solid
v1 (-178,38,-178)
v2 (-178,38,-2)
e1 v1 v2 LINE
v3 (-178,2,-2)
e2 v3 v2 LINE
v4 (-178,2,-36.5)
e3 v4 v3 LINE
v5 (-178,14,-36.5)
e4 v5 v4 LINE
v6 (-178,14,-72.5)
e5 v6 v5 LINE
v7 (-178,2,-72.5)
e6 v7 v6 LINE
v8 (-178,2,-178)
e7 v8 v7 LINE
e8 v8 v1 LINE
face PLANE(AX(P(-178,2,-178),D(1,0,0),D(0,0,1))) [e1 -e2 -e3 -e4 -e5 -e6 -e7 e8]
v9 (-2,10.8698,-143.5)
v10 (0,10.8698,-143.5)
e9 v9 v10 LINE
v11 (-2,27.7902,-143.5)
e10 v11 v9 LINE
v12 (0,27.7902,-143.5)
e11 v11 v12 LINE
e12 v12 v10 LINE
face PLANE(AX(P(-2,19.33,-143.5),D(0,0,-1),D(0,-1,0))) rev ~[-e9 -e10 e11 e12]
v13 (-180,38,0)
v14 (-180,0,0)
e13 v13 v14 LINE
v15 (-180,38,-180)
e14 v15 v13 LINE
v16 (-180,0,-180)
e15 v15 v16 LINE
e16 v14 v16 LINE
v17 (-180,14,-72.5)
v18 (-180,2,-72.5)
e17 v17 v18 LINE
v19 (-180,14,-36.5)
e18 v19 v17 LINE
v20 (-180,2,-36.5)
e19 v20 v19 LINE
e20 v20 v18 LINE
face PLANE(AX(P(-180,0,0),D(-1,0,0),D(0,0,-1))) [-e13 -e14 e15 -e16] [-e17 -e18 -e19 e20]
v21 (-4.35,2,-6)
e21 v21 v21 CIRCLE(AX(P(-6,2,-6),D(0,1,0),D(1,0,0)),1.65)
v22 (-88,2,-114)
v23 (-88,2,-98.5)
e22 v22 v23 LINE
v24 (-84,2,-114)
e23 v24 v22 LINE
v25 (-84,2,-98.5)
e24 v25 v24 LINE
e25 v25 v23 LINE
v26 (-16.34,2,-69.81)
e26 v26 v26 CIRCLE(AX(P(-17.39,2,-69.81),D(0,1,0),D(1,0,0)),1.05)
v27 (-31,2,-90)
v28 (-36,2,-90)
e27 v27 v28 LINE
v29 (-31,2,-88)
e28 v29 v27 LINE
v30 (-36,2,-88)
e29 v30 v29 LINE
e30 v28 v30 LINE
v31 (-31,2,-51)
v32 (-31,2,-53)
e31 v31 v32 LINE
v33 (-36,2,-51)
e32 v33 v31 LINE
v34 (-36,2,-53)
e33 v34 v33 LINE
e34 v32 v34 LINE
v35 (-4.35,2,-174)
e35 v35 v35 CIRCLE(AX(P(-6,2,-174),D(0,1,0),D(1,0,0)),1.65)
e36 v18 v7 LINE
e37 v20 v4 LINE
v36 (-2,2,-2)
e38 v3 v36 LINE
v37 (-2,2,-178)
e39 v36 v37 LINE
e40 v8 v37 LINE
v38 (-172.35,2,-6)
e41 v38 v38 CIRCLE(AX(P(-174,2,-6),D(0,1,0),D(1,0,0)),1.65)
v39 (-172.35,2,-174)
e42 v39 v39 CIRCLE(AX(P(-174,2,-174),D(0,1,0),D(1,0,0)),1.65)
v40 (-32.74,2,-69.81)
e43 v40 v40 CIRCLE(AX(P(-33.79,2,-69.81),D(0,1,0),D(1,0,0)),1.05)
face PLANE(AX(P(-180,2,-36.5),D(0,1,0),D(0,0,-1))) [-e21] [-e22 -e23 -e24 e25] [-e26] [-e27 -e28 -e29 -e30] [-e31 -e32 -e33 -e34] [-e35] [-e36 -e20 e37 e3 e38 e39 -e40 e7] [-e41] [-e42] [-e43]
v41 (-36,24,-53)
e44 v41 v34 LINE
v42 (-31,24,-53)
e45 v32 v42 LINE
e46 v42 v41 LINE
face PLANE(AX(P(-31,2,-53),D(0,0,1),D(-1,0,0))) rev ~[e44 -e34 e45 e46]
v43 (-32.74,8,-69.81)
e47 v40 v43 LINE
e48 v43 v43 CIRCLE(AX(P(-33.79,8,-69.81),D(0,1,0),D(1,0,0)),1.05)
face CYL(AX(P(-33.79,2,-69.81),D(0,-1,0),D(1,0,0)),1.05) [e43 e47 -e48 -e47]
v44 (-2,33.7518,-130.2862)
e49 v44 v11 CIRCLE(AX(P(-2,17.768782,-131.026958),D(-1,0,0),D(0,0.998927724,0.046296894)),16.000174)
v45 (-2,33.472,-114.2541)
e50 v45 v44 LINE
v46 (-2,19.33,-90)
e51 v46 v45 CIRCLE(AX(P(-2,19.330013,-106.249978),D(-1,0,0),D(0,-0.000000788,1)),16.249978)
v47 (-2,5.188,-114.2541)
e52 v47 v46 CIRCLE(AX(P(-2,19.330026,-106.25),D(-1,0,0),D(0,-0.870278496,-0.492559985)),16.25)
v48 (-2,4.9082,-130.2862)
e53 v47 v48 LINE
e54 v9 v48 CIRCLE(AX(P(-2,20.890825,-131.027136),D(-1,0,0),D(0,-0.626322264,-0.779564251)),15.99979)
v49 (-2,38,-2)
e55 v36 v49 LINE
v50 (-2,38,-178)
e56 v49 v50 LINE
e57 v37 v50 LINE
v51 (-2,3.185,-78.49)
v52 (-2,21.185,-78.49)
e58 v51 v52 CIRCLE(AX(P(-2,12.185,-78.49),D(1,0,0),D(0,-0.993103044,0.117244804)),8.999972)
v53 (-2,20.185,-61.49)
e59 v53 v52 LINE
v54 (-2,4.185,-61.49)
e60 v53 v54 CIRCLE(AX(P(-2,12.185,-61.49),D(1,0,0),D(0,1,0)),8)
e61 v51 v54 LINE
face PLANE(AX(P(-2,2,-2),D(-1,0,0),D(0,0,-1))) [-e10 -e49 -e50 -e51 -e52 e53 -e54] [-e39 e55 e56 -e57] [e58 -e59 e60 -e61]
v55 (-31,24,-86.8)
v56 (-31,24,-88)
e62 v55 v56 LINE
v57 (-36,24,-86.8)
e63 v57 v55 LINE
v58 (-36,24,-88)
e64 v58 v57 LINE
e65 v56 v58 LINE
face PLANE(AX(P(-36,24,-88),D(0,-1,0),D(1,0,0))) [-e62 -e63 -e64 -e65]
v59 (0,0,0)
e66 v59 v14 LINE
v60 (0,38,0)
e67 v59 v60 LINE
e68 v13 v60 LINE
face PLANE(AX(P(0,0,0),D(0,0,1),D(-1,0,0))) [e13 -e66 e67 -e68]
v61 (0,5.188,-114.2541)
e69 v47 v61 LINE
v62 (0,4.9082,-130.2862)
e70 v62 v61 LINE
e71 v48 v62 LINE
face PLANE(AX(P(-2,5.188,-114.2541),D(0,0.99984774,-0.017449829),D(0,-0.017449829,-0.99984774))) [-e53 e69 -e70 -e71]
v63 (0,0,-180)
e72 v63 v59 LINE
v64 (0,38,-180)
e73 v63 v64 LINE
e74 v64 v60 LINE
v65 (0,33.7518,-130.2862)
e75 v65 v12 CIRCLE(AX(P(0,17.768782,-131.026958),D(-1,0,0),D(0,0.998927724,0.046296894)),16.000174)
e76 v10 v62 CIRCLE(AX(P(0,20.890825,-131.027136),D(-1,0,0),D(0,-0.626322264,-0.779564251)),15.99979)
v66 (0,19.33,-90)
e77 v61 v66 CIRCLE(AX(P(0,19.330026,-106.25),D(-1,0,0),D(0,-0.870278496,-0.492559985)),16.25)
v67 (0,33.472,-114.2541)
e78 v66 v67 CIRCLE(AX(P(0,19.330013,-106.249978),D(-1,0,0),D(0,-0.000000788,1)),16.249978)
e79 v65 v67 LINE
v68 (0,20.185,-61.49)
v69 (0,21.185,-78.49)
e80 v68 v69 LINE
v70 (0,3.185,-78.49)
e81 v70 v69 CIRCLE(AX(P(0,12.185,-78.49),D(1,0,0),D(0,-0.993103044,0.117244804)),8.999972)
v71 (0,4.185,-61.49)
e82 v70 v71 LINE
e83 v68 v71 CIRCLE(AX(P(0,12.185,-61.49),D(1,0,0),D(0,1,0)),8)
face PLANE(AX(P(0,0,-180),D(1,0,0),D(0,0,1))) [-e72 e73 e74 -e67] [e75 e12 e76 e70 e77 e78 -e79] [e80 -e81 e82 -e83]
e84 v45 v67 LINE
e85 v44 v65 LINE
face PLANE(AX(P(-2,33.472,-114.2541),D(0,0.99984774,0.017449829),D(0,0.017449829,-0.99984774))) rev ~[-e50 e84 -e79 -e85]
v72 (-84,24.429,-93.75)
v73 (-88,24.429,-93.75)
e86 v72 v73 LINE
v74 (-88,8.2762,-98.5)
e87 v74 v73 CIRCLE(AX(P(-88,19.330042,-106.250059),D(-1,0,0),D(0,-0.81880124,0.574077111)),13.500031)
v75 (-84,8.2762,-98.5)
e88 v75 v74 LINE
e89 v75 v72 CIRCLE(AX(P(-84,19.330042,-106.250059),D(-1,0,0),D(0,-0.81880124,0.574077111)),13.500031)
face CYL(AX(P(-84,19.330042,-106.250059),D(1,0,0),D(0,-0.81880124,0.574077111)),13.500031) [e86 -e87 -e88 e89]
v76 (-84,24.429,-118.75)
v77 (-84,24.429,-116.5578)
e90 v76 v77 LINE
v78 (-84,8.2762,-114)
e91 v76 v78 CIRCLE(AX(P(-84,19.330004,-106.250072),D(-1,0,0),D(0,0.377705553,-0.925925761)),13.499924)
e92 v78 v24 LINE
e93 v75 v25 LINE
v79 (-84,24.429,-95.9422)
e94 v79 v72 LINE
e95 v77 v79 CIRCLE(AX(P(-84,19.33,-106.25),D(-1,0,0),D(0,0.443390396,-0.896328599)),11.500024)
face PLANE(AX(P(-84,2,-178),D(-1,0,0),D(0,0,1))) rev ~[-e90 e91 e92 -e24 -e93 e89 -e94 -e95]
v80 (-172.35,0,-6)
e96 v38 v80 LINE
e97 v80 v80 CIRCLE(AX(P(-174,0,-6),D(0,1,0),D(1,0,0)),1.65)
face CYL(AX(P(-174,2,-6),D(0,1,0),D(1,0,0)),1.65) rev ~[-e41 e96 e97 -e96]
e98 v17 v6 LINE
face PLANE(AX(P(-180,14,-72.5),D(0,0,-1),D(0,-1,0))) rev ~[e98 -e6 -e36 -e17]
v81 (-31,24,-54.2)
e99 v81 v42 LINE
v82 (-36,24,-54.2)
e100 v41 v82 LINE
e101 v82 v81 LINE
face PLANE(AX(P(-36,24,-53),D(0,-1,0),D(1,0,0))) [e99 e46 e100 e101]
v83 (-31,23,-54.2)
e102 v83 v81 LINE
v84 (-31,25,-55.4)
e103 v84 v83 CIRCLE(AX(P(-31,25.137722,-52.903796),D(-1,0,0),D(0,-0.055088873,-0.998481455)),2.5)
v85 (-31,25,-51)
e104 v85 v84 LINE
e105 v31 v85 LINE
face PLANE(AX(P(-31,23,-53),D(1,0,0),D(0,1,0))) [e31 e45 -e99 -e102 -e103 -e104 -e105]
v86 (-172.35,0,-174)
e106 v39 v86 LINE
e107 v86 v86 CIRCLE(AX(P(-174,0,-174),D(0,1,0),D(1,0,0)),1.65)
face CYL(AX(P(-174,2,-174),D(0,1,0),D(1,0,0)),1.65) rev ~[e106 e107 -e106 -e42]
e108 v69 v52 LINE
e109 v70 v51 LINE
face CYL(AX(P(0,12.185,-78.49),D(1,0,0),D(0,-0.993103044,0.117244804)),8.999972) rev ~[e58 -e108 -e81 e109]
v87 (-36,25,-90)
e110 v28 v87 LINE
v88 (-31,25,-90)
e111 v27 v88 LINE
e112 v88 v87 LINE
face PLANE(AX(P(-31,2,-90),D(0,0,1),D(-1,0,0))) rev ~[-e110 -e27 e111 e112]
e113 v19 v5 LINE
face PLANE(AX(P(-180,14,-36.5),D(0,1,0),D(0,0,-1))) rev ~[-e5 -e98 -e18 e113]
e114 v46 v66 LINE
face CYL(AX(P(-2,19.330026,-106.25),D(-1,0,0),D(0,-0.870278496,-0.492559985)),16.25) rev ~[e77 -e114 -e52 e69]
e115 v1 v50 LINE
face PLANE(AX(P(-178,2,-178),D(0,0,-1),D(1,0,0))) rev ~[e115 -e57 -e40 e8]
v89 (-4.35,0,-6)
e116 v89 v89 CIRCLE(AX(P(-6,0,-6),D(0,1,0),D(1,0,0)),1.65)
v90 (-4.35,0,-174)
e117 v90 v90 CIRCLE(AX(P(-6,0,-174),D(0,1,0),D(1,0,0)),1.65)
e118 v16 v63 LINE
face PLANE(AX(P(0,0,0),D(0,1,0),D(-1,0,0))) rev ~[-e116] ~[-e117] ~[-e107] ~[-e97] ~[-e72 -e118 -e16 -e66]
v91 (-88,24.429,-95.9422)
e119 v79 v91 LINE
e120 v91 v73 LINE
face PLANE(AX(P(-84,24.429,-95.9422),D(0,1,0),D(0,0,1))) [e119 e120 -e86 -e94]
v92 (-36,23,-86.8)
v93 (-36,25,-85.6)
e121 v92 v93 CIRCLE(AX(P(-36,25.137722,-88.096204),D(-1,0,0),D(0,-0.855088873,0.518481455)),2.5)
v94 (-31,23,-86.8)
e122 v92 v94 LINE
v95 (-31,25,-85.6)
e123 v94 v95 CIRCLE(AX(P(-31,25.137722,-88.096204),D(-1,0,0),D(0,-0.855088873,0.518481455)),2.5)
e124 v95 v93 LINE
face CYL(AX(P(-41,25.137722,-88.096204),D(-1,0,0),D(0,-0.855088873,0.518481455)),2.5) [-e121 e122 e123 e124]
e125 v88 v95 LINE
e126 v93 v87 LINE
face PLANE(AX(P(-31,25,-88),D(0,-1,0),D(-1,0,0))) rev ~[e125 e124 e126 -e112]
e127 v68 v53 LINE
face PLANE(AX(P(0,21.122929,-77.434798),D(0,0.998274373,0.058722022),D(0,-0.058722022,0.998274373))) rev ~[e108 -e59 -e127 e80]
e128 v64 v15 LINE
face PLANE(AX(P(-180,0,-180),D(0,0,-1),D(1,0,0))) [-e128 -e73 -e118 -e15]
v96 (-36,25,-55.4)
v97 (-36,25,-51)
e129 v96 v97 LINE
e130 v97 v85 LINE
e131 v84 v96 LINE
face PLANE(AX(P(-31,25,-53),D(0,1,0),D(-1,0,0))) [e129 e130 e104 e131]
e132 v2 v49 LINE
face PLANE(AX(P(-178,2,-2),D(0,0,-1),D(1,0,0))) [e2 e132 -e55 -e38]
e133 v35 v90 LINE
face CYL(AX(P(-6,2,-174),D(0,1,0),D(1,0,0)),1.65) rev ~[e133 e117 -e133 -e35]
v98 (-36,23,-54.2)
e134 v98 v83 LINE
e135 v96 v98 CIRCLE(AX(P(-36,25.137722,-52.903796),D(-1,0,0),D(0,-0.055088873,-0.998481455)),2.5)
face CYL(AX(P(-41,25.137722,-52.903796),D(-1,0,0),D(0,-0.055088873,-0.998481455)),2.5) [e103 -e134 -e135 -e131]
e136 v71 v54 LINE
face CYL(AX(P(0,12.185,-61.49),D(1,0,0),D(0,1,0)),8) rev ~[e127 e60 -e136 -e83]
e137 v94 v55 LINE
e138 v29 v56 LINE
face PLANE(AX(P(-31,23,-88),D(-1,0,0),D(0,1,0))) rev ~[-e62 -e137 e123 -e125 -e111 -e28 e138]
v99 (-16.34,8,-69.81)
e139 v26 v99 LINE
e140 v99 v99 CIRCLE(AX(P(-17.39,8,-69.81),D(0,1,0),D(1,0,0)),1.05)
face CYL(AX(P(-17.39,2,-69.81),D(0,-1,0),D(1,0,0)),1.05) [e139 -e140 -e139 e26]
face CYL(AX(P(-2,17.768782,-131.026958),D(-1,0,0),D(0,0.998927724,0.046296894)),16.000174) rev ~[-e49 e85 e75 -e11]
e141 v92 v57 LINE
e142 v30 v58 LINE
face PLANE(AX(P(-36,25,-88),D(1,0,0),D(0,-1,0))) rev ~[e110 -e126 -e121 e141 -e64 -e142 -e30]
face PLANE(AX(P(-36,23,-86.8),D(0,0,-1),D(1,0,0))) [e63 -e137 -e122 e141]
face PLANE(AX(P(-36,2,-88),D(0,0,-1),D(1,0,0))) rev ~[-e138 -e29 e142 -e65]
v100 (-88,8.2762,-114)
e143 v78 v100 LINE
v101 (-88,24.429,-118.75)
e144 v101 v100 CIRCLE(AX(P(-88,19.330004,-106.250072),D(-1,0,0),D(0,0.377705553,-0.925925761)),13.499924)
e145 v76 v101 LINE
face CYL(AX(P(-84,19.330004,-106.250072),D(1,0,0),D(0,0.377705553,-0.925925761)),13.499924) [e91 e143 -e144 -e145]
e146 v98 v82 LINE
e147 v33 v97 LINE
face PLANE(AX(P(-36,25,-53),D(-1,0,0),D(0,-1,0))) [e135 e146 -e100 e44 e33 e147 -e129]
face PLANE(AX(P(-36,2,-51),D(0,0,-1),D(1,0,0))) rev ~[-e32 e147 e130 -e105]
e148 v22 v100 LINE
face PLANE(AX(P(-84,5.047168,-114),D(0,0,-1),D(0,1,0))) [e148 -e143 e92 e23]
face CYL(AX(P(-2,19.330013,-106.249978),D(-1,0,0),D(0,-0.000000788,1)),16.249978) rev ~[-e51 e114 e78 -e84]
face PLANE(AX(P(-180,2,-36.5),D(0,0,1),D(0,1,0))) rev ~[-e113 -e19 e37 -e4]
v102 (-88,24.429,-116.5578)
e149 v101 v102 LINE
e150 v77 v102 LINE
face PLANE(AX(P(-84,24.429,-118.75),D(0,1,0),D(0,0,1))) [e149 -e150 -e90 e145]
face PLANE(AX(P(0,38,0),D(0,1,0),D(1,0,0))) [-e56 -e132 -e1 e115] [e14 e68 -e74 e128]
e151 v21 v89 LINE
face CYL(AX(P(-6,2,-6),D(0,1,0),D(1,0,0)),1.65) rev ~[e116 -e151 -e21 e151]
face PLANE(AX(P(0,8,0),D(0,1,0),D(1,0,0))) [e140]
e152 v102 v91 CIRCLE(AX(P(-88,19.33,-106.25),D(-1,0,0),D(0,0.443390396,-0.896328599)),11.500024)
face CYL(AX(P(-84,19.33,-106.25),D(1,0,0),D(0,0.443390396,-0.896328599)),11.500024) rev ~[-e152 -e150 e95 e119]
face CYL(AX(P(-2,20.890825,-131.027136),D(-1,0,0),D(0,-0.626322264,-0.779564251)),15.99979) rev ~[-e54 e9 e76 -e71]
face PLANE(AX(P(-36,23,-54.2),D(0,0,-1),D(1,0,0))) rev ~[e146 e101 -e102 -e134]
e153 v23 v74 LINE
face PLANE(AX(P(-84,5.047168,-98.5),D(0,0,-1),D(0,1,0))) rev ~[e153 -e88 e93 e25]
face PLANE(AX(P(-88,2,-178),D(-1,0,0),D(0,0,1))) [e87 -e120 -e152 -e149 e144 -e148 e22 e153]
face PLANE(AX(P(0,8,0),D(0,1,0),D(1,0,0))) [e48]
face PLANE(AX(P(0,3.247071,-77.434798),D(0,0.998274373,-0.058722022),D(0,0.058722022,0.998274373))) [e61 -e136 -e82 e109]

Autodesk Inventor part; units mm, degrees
ref_plane "YZ Plane" through (0, 0, 0) normal (1, 0, 0) x (0, 1, 0)
ref_plane "XZ Plane" through (0, 0, 0) normal (0, 1, 0) x (-1, 0, 0)
sketch "Sketch1" plane through (0, 0, 0) normal (0, 1, 0) x (-1, 0, 0)
  line L0 (0, 0) -> (180, 0)
  line L1 (180, 0) -> (180, -180)
  line L2 (180, -180) -> (0, -180)
  line L3 (0, -180) -> (0, 0)
  dimension "d0" = 180
  dimension "d1" = 180
extrude "Extrusion1" add sketch "Sketch1" along normal blind 2
sketch "Sketch4" plane through (0, 2, 0) normal (0, 1, 0) x (1, 0, 0)
  line L0 (0, 180) -> (-180, 180) projected
  line L1 (-180, 180) -> (-180, 0) projected
  line L2 (0, 180) -> (-180, 180)
  line L3 (-180, 180) -> (-180, 178)
  line L4 (-180, 178) -> (0, 178)
  line L5 (0, 178) -> (0, 180)
  line L6 (-180, 0) -> (0, 0) projected
  line L7 (0, 0) -> (-180, 0)
  line L8 (-180, 0) -> (-180, 2)
  line L9 (-180, 2) -> (0, 2)
  line L10 (0, 2) -> (0, 0)
  line L11 (0, 2) -> (-2, 2)
  line L12 (-2, 2) -> (-2, 178)
  line L13 (-2, 178) -> (0, 178)
  line L14 (0, 178) -> (0, 2)
  line L15 (-180, 178) -> (-178, 178)
  line L16 (-178, 178) -> (-178, 2)
  line L17 (-178, 2) -> (-180, 2)
  line L18 (-180, 2) -> (-180, 178)
  dimension "d16" = 2
  dimension "d17" = 2
  dimension "d18" = 2
  dimension "d19" = 2
extrude "Extrusion4" add sketch "Sketch4" along normal blind 36 contours L5 L4 L1 L0 | L14 L9 L12 L4 | L4 L16 L9 L1 | L10 L6 L1 L9
sketch "Sketch5" plane through (0, 2, 0) normal (0, 1, 0) x (1, 0, 0)
  circle A0 centre (-174, 6) radius 1.65
  circle A1 centre (-174, 174) radius 1.65
  circle A2 centre (-6, 174) radius 1.65
  circle A3 centre (-6, 6) radius 1.65
  point P0 (0, 0)
  dimension "d22" = 3.3
  dimension "d23" = 3.3
  dimension "d24" = 3.3
  dimension "d25" = 3.3
extrude "Extrusion5" cut sketch "Sketch5" against normal through all
sketch "Sketch8" plane through (-180, 0, -180) normal (-1, 0, 0) x (0, 0, 1)
  line L0 (178, 2) -> (2, 2) projected
  line L1 (143.5, 14) -> (107.5, 14)
  line L2 (107.5, 14) -> (107.5, 2)
  line L3 (107.5, 2) -> (143.5, 2)
  line L4 (143.5, 2) -> (143.5, 14)
  line L5 (178, 2) -> (178, 38) projected
  point P0 (180, 0)
  point P1 (143.5, 2)
  point P2 (107.5, 2)
  dimension "d84" = 36
  dimension "d101" = 12
  dimension "d108" = 34.5
extrude "Extrusion10" cut sketch "Sketch8" against normal blind 10
sketch "Sketch15" plane through (-2, 2, -2) normal (-1, 0, 0) x (0, 0, 1)
  line L0 (-141.5, 17.33) -> (-133.04, 17.33) construction
  line L1 (-112.2541, 3.188) -> (-128.2862, 2.9082)
  arc A0 (-141.5, 8.8698) -> (-128.2862, 2.9082) centre (-129.027, 18.891) ccw
  arc A1 (-112.2541, 3.188) -> (-88, 17.33) centre (-104.25, 17.33) ccw
  line L2 (-112.2541, 31.472) -> (-128.2862, 31.7518)
  arc A2 (-128.2862, 31.7518) -> (-141.5, 25.7902) centre (-129.027, 15.769) ccw
  arc A3 (-88, 17.33) -> (-112.2541, 31.472) centre (-104.25, 17.33) ccw
  line L3 (-141.5, 17.33) -> (-141.5, 8.8698)
  line L4 (-141.5, 17.33) -> (-141.5, 25.7902)
  line L5 (-176, 36) -> (0, 36) projected
  line L6 (0, 0) -> (-176, 0) projected
  point P0 (2, -2)
extrude "Extrusion17" cut sketch "Sketch15" against normal through all
ref_plane "Work Plane1" through (-84, 2, -178) normal (-1, 0, 0) x (0, 0, 1)
sketch "Sketch16" plane through (-84, 2, -178) normal (-1, 0, 0) x (0, 0, 1)
  arc A0 (63.7459, 3.188) -> (63.7459, 31.472) centre (71.75, 17.33) ccw projected
  line L0 (176, 0) -> (0, 0) projected
  line L1 (71.75, 0) -> (79.5, 0)
  line L2 (-2, -2) -> (178, -2) projected
  line L3 (45.25, 0) -> (53, 0) construction
  line L4 (79.5, 0) -> (79.5, 6.2762)
  line L5 (71.75, 0) -> (64, 0)
  line L6 (45.25, 0) -> (53, 0) construction
  line L7 (64, 0) -> (64, 6.2762)
  arc A1 (61.4422, 22.429) -> (82.0578, 22.429) centre (71.75, 17.33) ccw
  line L8 (59.25, 22.429) -> (61.4422, 22.429)
  line L9 (82.0578, 22.429) -> (84.25, 22.429)
  arc A2 (59.25, 22.429) -> (64, 6.2762) centre (71.75, 17.33) ccw
  arc A3 (79.5, 6.2762) -> (84.25, 22.429) centre (71.75, 17.33) ccw
  dimension "d135" = 23
extrude "Extrusion18" add sketch "Sketch16" along normal blind 4
sketch "Sketch17" plane through (0, 0, 0) normal (1, 0, 0) x (0, 0, -1)
  line L0 (36.5, 2) -> (2, 2) projected
  line L1 (53, 2) -> (88, 2)
  line L2 (88, 2) -> (88, 23.37)
  line L3 (88, 23.37) -> (53, 23.37)
  line L4 (53, 23.37) -> (53, 2)
  line L5 (0, 0) -> (0, 38) projected
  arc A0 (61.49, 20.185) -> (61.49, 4.185) centre (61.49, 12.185) ccw
  arc A1 (77.4348, 3.2471) -> (77.4348, 21.1229) centre (78.49, 12.185) ccw
  line L6 (78.49, 3.185) -> (61.49, 4.185)
  line L7 (78.49, 21.185) -> (61.49, 20.185)
  dimension "d144" = 35
  dimension "d145" = 21.37
  dimension "d147" = 16
  dimension "d148" = 18
extrude "Extrusion19" cut sketch "Sketch17" against normal blind 10 contours L7 A1 L6 A0
sketch "Sketch21" plane through (0, 2, 0) normal (0, 1, 0) x (1, 0, 0)
  circle A0 centre (-17.39, 69.81) radius 1.05
  circle A1 centre (-33.79, 69.81) radius 1.05
  point P0 (0, 0)
  dimension "d155" = 2.1
  dimension "d156" = 2.1
extrude "Extrusion21" add sketch "Sketch21" along normal blind 6
sketch "Sketch22" plane through (0, 2, 0) normal (0, 1, 0) x (1, 0, 0)
  line L0 (-36, 88) -> (-31, 88)
  line L1 (-31, 88) -> (-31, 90)
  line L2 (-31, 90) -> (-36, 90)
  line L3 (-36, 90) -> (-36, 88)
  line L4 (-31, 53) -> (-36, 53)
  line L5 (-36, 53) -> (-36, 51)
  line L6 (-36, 51) -> (-31, 51)
  line L7 (-31, 51) -> (-31, 53)
  line L8 (-2, 2) -> (-2, 178) projected
  line L9 (-2, 90) -> (-178, 90) construction
  line L10 (-178, 178) -> (-178, 72.5) projected
  point P0 (0, 0)
  dimension "d159" = 5
  dimension "d160" = 2
  dimension "d161" = 5
  dimension "d162" = 2
extrude "Extrusion22" add sketch "Sketch22" along normal blind 23
sketch "Sketch23" plane through (-36, 2, -88) normal (0, 0, 1) x (1, 0, 0)
  line L0 (5, 0) -> (5, 23) projected
  line L1 (5, 23) -> (0, 23)
  line L2 (0, 23) -> (0, 21)
  line L3 (0, 21) -> (5, 21)
  line L4 (5, 21) -> (5, 23)
  point P0 (36, -2)
  dimension "d165" = 5
  dimension "d166" = 2
sketch "Sketch24" plane through (-31, 2, -53) normal (0, 0, -1) x (-1, 0, 0)
  line L0 (0, 23) -> (5, 23)
  line L1 (5, 23) -> (5, 21)
  line L2 (5, 21) -> (0, 21)
  line L3 (0, 21) -> (0, 23)
  point P0 (-31, -2)
  dimension "d167" = 5
  dimension "d168" = 2
extrude "Extrusion23" add sketch "Sketch23" along normal blind 2.4
extrude "Extrusion24" add sketch "Sketch24" along normal blind 2.4
sketch "Sketch25" plane through (-36, 23, -88) normal (0, -1, 0) x (1, 0, 0)
  line L0 (5, 0) -> (0, 0)
  line L1 (0, 0) -> (0, 1.2)
  line L2 (0, 1.2) -> (5, 1.2)
  line L3 (5, 1.2) -> (5, 0)
  point P0 (36, 88)
  dimension "d173" = 5
  dimension "d174" = 1.2
sketch "Sketch26" plane through (-36, 23, -53) normal (0, -1, 0) x (1, 0, 0)
  line L0 (5, 0) -> (0, 0)
  line L1 (0, 0) -> (0, -1.2)
  line L2 (0, -1.2) -> (5, -1.2)
  line L3 (5, -1.2) -> (5, 0)
  point P0 (36, 53)
  dimension "d175" = 5
  dimension "d176" = 1.2
extrude "Extrusion25" cut sketch "Sketch26" against normal blind 1
extrude "Extrusion26" cut sketch "Sketch25" against normal blind 1
fillet "Fillet1" radius 2.5 2 edges at (-33.5, 23, -85.6) (-33.5, 23, -55.4)
properties part number "base plate"
